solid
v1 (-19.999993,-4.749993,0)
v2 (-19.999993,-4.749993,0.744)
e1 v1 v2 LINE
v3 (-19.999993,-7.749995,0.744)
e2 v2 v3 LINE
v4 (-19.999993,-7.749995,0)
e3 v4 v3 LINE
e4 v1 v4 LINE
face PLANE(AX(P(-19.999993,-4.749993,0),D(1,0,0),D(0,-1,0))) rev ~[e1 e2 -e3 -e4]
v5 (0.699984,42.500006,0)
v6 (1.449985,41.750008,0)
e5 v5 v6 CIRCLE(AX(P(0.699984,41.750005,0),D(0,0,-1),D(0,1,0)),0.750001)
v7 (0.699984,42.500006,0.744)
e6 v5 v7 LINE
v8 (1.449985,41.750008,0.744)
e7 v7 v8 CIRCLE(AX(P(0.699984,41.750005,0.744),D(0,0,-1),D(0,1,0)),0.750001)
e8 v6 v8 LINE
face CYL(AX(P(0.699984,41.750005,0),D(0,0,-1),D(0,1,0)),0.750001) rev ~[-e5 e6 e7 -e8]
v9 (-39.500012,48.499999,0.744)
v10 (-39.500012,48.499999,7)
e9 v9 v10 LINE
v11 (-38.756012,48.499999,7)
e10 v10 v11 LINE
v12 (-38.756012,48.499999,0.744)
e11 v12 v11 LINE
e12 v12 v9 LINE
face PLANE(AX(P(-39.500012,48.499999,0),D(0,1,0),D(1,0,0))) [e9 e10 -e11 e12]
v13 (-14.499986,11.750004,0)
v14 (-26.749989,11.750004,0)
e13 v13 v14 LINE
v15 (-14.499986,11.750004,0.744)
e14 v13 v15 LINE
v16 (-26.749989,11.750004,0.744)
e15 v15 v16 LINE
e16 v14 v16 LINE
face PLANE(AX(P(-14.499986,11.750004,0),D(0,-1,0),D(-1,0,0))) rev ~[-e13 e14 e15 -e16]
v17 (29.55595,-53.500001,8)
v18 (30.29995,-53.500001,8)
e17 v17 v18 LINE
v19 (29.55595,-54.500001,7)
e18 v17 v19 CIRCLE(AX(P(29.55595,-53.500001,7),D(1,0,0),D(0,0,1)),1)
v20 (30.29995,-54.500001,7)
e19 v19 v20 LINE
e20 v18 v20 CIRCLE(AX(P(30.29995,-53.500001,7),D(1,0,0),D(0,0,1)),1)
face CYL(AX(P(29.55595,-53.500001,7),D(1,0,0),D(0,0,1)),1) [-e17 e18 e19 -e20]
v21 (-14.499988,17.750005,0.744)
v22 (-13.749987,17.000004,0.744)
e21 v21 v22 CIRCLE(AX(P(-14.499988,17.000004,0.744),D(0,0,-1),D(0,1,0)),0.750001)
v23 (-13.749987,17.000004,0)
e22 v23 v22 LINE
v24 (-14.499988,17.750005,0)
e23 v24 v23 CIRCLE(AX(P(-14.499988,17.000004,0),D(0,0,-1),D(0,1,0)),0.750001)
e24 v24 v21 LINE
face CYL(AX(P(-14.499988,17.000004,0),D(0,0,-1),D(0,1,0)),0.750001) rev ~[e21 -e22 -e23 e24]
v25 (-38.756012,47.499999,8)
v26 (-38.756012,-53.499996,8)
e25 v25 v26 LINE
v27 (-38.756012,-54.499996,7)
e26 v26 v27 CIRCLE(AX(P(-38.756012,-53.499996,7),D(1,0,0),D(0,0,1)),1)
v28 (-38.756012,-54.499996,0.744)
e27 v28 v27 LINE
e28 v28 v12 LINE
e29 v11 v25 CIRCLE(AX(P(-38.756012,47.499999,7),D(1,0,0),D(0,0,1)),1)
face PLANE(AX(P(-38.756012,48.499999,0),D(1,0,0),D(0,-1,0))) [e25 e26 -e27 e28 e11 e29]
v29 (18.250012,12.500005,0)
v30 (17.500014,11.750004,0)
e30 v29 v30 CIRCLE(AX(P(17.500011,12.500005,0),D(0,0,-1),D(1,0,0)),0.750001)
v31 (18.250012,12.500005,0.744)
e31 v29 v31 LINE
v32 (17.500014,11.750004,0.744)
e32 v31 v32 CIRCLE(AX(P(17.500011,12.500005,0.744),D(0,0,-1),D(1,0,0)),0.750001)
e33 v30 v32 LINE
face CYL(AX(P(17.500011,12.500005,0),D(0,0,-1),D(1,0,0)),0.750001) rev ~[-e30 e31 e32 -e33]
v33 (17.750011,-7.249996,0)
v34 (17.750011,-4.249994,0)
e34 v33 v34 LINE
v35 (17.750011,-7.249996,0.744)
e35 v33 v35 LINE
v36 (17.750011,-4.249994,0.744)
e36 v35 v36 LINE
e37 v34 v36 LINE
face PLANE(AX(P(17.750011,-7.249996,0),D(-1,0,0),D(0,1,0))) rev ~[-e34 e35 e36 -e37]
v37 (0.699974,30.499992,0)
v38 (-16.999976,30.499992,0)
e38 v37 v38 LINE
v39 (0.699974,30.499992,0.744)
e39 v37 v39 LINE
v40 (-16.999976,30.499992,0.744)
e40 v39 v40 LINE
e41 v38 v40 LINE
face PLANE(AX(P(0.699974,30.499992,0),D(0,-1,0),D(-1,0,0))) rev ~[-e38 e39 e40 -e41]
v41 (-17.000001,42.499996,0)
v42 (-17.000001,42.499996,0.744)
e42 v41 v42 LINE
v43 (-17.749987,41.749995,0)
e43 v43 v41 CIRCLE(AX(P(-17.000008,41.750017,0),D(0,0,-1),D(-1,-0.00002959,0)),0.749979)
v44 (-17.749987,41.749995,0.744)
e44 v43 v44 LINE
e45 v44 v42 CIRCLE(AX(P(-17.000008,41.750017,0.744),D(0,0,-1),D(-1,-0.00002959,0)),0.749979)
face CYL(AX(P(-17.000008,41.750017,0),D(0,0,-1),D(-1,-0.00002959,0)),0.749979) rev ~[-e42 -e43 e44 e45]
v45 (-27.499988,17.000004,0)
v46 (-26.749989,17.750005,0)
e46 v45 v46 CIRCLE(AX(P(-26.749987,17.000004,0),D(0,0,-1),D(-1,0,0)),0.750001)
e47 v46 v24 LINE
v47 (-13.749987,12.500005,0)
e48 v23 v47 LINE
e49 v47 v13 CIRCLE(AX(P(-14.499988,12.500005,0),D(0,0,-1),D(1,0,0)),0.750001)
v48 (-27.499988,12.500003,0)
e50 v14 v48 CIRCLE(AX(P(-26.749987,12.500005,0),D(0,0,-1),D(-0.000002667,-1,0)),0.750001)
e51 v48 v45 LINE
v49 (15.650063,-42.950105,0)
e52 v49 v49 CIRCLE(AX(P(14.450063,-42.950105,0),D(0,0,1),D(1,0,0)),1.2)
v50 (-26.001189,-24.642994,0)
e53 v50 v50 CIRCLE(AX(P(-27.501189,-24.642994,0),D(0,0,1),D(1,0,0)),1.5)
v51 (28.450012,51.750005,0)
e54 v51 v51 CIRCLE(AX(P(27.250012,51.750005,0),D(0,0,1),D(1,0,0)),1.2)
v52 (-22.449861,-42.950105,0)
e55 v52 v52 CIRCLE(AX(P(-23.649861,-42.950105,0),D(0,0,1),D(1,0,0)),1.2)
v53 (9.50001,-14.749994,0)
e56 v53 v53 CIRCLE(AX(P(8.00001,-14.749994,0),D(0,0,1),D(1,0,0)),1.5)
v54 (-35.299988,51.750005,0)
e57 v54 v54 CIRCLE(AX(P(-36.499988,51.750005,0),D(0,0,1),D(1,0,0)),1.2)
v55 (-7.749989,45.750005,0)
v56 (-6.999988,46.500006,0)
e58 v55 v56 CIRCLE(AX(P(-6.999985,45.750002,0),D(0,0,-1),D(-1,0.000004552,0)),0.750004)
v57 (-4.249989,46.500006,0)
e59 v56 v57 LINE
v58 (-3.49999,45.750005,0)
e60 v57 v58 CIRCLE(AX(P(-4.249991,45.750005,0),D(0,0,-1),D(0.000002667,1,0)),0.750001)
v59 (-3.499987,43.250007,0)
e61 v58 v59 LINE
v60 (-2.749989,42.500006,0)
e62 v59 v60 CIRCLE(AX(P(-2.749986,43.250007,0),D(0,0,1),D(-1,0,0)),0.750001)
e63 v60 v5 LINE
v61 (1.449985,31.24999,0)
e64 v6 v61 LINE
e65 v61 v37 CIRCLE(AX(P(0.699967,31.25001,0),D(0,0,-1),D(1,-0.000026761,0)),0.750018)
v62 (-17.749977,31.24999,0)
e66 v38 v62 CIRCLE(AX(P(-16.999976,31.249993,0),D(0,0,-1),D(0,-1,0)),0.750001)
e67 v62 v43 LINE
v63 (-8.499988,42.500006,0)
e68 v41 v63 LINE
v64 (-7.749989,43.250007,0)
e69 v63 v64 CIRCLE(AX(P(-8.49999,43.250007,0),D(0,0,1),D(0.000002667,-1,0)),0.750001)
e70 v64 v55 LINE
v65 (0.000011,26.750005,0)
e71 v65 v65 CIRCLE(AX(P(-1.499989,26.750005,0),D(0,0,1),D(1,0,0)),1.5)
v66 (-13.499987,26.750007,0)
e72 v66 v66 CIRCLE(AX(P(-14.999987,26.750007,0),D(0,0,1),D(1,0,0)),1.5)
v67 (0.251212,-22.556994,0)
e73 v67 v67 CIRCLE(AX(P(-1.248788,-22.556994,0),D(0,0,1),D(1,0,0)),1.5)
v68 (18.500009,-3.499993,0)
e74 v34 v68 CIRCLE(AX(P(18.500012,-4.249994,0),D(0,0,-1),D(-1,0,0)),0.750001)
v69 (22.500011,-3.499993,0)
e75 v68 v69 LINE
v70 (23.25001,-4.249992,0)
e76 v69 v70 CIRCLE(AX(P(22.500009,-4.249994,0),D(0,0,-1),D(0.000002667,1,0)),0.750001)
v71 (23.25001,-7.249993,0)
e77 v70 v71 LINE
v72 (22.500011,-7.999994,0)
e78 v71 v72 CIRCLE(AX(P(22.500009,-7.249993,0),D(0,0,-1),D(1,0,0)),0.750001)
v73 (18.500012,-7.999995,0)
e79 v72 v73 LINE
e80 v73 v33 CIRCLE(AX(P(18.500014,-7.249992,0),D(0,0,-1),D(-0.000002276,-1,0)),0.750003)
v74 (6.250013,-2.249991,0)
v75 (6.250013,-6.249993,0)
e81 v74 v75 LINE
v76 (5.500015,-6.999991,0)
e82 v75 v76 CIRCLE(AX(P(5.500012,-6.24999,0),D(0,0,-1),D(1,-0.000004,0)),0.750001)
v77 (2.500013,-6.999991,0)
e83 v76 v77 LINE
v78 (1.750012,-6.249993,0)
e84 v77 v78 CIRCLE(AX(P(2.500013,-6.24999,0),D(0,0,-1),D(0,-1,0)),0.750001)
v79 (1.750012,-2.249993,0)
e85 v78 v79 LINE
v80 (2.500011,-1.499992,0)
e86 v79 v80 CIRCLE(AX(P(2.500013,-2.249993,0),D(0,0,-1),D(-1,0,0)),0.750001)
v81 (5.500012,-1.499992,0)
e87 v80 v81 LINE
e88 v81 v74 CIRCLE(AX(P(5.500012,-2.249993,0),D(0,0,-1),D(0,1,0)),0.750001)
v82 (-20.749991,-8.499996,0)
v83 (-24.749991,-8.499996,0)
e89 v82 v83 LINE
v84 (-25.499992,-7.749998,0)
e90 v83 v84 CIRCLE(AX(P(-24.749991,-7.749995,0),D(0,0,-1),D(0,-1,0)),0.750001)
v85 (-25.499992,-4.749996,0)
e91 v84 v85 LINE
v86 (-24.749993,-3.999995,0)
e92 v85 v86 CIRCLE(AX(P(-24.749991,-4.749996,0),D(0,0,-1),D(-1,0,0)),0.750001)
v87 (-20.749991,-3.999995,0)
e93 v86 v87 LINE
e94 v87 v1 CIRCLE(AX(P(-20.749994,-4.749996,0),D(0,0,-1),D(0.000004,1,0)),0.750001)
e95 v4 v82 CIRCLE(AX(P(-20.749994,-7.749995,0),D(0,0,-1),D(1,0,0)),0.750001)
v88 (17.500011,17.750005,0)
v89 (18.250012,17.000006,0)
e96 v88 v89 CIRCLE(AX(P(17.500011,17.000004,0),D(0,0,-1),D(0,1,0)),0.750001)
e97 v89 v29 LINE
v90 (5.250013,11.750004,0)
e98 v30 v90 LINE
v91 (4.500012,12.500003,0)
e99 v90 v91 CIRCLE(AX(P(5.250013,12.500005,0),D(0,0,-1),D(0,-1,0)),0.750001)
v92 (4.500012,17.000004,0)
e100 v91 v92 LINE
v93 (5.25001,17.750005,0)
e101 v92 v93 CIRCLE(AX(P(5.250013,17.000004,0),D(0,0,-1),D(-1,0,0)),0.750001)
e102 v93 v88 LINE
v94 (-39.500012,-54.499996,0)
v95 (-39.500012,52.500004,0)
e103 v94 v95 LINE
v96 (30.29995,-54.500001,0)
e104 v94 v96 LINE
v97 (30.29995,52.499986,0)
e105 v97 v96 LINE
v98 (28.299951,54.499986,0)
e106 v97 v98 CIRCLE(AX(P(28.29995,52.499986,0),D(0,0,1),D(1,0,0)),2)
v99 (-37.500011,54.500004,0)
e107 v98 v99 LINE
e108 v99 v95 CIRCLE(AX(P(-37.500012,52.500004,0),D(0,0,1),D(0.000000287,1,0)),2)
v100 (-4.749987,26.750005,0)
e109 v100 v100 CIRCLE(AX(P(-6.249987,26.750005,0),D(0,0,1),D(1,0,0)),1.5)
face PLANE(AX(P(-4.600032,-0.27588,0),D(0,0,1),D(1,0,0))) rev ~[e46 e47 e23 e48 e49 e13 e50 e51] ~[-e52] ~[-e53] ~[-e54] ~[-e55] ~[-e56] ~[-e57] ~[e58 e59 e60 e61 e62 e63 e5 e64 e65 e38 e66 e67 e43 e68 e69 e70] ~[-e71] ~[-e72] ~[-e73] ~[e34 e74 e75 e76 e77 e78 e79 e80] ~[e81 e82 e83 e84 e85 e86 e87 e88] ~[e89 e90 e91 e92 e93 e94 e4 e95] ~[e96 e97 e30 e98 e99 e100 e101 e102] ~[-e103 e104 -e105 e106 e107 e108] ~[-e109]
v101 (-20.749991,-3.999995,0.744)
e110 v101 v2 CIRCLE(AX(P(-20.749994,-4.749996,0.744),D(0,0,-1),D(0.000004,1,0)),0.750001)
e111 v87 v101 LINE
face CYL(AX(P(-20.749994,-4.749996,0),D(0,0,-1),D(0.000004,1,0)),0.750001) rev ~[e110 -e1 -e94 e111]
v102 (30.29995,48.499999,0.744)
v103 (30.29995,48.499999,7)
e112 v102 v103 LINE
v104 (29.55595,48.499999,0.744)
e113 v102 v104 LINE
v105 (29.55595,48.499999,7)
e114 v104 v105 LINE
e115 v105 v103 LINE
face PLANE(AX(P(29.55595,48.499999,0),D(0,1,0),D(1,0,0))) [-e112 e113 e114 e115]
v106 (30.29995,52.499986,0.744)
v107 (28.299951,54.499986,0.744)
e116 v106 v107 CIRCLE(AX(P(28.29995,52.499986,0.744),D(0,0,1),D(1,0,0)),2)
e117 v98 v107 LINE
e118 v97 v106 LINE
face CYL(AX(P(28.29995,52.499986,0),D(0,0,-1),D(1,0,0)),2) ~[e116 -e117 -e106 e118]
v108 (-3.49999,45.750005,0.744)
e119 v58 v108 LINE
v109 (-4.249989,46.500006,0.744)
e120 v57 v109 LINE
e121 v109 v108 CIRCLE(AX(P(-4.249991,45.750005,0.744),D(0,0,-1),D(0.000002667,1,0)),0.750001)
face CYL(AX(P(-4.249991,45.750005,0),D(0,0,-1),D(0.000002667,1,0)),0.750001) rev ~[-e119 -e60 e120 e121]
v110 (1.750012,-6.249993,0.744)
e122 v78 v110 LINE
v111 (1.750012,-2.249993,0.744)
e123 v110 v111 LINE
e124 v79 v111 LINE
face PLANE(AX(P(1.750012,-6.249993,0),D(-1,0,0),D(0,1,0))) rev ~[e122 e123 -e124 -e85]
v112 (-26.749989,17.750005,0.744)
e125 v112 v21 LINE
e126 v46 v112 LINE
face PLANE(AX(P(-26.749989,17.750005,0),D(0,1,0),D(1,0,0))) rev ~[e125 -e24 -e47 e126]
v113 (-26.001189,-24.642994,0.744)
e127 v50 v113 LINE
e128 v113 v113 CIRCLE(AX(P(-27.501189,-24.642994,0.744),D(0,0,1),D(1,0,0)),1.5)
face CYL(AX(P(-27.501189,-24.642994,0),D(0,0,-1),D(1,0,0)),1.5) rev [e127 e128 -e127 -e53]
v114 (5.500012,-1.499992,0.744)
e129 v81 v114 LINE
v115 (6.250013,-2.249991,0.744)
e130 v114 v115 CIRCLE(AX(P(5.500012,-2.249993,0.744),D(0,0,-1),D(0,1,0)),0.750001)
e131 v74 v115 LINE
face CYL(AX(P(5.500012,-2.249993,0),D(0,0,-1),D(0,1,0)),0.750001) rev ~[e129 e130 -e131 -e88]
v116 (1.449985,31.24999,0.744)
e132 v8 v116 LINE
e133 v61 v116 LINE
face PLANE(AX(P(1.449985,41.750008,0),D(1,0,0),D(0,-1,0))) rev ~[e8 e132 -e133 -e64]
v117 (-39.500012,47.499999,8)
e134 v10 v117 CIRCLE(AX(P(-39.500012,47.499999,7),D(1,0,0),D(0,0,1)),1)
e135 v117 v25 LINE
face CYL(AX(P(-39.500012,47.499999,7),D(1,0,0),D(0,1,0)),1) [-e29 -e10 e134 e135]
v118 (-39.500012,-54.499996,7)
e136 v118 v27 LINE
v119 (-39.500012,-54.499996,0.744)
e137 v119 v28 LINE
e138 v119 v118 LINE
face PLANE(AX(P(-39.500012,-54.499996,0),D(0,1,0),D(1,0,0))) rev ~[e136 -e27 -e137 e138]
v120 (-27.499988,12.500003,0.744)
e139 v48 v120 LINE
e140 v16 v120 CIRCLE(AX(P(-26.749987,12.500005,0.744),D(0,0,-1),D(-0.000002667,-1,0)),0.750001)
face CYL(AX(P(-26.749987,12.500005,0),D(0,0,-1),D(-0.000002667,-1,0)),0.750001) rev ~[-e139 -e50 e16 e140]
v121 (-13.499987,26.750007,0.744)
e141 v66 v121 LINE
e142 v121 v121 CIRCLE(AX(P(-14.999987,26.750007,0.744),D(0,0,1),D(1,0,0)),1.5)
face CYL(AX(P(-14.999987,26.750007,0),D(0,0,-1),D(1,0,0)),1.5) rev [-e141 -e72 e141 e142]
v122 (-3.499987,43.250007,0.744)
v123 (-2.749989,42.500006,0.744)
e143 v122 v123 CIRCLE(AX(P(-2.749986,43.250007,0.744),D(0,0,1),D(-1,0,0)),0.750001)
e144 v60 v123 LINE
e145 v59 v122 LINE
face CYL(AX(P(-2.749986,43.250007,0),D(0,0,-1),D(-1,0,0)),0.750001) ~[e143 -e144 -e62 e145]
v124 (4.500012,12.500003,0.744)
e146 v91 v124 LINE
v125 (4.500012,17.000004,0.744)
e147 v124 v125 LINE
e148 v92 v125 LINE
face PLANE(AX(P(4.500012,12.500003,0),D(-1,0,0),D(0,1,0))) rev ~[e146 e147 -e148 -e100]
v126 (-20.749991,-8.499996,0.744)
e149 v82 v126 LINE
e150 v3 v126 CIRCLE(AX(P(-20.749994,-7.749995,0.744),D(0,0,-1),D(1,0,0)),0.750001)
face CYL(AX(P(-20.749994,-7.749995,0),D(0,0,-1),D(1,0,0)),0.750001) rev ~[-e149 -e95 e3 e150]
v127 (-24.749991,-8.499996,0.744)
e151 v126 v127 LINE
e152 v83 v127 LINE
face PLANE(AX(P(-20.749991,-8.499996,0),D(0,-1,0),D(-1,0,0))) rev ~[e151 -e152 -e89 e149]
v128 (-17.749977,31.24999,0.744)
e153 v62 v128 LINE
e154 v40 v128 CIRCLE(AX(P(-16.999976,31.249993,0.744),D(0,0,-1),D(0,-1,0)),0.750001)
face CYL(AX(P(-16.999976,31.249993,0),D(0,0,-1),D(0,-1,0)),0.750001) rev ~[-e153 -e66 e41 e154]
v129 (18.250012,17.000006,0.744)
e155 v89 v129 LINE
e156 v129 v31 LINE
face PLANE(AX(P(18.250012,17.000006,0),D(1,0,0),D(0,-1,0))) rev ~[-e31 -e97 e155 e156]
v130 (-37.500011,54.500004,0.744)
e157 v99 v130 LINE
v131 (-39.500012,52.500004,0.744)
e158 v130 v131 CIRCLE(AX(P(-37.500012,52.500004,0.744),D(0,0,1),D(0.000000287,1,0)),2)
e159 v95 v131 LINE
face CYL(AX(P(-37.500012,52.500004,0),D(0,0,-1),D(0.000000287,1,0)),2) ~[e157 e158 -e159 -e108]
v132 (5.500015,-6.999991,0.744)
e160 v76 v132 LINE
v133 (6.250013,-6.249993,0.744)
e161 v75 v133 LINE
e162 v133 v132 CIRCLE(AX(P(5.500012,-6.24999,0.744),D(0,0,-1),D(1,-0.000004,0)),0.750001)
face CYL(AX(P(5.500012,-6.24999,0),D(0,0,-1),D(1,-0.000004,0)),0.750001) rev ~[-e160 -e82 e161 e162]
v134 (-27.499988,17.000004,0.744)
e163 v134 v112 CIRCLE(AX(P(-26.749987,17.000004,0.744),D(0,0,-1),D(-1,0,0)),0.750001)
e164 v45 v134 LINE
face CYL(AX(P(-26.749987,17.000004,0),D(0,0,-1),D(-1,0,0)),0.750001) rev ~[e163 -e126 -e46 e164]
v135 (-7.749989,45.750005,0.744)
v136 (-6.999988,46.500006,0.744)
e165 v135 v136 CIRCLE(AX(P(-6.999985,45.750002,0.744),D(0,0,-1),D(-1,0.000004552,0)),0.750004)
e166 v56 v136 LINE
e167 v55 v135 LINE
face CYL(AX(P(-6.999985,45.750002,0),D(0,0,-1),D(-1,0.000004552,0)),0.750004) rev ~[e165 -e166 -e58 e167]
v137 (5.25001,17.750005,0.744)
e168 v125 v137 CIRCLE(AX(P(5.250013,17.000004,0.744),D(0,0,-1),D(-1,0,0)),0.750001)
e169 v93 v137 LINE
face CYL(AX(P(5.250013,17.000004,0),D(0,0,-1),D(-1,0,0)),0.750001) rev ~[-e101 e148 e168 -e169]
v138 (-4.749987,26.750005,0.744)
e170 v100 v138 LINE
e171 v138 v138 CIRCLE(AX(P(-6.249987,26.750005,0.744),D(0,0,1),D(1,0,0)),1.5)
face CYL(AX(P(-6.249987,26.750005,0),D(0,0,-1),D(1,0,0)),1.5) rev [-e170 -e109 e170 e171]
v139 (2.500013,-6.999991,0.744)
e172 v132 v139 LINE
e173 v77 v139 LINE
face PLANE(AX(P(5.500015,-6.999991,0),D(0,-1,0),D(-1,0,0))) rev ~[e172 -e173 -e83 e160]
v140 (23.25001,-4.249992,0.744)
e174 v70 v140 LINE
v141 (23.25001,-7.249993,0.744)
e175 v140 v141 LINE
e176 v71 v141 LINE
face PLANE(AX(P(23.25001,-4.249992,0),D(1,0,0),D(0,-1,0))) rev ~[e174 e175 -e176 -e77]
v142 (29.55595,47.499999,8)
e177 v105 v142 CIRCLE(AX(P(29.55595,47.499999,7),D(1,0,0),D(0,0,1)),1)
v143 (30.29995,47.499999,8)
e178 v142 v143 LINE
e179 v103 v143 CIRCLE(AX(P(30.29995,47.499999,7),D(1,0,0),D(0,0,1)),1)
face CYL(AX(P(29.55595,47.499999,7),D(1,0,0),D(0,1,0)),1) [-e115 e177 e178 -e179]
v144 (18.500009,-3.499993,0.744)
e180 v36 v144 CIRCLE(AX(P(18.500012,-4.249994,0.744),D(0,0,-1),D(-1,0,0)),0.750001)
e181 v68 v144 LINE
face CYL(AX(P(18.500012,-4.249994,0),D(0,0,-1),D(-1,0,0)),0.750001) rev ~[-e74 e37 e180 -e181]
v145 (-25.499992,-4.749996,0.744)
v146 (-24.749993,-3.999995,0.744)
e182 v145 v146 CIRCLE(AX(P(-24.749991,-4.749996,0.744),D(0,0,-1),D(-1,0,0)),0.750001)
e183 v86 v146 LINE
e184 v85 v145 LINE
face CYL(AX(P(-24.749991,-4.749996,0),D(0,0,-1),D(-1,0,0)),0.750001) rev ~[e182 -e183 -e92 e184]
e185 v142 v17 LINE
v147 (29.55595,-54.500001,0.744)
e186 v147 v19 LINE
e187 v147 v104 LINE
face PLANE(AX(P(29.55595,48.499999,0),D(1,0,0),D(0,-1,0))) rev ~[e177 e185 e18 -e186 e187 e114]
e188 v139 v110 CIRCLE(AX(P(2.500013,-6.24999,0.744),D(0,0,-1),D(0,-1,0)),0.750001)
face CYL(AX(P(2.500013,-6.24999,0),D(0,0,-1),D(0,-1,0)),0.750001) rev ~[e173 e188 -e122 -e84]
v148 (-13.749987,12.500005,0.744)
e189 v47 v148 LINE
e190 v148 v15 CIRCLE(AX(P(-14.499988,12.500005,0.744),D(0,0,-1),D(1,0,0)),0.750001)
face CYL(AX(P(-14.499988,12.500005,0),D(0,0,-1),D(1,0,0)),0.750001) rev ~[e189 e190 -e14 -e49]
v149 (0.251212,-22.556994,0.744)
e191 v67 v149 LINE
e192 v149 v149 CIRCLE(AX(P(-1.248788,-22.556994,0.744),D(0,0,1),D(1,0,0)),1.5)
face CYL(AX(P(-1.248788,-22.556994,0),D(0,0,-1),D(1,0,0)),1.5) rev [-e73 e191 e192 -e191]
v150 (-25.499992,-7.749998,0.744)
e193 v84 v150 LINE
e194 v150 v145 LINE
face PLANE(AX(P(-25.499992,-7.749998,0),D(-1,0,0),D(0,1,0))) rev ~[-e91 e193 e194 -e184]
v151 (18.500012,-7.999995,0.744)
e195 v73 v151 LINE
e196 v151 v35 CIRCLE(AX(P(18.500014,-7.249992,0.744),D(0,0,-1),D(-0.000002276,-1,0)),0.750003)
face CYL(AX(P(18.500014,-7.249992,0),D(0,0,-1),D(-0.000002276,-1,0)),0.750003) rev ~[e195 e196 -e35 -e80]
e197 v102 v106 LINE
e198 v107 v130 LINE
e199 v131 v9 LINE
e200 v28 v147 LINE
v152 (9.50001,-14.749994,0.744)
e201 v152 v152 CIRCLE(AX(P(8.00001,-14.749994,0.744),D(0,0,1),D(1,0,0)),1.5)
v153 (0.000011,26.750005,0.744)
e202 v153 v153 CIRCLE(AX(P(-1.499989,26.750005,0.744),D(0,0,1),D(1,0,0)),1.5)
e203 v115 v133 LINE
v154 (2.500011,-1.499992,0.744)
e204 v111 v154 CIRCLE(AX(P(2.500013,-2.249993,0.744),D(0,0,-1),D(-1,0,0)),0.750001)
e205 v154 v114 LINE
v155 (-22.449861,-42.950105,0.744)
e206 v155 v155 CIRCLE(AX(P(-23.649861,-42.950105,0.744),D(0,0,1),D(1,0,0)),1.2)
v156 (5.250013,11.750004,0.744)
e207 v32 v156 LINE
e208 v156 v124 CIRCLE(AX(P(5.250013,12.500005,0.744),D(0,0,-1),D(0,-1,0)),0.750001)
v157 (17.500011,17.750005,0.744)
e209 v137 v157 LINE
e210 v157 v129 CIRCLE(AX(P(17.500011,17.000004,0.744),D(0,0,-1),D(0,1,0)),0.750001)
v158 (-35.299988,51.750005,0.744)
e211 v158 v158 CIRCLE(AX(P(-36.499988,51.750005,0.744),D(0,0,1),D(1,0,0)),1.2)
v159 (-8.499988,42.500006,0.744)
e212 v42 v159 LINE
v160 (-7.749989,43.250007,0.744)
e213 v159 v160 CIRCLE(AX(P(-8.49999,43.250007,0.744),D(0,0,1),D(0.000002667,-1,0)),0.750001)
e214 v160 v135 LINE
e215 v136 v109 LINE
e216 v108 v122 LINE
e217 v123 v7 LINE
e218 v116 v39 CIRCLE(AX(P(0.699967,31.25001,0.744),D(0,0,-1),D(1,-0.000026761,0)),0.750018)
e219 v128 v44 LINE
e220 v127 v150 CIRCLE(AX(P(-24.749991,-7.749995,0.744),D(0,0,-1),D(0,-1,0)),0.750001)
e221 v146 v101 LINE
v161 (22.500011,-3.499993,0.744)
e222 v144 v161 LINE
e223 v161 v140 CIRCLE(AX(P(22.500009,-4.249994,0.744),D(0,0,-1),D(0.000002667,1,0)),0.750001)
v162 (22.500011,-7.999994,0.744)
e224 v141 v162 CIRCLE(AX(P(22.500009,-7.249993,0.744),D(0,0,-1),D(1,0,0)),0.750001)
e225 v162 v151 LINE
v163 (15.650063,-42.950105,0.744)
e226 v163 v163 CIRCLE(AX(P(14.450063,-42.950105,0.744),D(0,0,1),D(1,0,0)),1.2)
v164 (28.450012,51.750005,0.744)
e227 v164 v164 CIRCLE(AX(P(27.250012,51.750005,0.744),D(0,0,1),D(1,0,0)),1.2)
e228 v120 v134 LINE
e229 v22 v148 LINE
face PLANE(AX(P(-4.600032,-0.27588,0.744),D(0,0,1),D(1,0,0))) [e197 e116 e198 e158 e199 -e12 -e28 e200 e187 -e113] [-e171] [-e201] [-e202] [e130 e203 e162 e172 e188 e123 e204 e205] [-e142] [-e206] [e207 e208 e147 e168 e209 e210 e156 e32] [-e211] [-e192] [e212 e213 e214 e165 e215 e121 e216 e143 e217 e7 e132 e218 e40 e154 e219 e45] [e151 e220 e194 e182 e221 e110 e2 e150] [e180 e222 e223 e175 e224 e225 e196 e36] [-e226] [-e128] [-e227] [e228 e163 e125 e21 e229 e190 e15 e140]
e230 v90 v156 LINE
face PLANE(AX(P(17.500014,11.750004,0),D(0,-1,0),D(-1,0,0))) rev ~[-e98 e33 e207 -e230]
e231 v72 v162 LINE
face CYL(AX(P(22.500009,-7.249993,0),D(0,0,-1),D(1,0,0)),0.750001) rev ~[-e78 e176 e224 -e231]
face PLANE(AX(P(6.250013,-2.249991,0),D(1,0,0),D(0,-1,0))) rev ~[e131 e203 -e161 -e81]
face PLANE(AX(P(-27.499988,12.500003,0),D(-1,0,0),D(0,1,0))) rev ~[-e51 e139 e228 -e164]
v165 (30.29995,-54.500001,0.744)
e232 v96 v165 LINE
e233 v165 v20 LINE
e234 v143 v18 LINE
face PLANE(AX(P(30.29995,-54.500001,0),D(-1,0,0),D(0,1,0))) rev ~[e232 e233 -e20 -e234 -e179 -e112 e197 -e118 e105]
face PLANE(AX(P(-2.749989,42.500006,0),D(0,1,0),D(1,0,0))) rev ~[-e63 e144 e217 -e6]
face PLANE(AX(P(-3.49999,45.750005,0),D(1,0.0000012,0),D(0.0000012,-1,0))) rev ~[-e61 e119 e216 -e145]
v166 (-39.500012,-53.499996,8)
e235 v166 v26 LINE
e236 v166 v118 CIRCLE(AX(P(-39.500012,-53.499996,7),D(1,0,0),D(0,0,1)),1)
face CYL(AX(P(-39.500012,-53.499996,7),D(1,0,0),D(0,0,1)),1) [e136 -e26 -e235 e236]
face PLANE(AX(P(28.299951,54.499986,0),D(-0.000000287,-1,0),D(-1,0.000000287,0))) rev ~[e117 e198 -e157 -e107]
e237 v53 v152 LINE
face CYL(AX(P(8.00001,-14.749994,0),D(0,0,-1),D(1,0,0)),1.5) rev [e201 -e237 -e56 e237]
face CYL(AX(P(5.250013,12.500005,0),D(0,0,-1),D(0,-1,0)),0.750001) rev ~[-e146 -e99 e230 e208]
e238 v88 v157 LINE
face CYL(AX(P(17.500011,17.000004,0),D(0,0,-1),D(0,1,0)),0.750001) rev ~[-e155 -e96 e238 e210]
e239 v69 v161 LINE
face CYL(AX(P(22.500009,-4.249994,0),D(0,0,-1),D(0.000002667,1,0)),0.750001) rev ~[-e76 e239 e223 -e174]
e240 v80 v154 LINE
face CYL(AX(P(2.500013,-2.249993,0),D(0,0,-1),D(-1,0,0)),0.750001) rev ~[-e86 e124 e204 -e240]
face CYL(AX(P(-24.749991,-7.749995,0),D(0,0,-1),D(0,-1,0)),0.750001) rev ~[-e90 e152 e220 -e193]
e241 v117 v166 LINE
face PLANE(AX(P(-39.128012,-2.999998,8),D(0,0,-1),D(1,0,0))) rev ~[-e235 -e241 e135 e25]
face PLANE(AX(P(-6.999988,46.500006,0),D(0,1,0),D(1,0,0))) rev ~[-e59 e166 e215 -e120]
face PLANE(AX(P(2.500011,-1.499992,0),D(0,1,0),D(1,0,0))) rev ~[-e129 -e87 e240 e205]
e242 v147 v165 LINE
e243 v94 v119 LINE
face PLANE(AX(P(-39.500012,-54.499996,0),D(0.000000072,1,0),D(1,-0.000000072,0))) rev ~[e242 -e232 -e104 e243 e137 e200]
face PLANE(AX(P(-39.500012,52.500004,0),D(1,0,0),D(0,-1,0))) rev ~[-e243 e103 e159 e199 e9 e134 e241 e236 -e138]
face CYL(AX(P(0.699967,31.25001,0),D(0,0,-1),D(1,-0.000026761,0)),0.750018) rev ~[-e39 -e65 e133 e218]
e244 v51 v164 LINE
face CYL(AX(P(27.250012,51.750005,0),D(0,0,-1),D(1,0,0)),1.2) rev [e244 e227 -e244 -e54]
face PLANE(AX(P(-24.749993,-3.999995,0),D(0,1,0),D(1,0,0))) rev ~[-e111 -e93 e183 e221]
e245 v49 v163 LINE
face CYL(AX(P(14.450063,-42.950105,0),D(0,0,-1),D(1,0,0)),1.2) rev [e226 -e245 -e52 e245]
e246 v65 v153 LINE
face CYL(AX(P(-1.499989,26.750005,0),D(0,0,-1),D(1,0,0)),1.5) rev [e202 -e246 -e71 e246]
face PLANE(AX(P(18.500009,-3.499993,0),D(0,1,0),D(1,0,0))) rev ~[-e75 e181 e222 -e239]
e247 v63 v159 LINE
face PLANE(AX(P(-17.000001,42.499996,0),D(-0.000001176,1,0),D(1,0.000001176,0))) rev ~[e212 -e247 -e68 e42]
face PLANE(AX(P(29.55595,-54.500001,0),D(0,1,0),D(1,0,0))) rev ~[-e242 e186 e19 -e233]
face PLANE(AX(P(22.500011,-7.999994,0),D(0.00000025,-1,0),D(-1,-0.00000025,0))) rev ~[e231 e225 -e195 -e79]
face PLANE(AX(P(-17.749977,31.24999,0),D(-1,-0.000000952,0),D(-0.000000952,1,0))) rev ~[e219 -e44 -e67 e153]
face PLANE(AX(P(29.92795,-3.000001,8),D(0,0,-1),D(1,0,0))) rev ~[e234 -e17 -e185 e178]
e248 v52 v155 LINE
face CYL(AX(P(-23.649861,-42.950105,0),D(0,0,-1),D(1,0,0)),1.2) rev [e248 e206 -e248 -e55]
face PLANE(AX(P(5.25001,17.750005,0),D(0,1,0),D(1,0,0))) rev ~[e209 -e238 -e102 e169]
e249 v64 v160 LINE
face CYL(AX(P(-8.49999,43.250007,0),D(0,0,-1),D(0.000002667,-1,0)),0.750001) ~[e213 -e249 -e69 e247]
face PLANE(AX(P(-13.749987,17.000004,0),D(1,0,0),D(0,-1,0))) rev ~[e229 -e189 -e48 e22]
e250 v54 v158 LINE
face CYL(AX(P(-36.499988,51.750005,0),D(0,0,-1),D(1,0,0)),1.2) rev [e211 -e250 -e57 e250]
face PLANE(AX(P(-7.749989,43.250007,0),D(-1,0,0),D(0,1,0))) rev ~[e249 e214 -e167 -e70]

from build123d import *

# Parameters (mm, degrees)
F0_R     = 1.2
F0_R_2   = 1.5
F1_DEPTH = 0.744
F2_W     = 0.744
F2_H     = 103
F2_H_2   = 102.999995
F3_DEPTH = 8
F4_R     = 1


# Not quite as in the source:
# - ends of sketch curves that miss each other by under 0.0002 mm in the source are joined


with BuildPart() as f1:
    # F0 (on Top) → F1 (new body)
    with BuildSketch(Plane.XY):
        with BuildLine():
            Line((-39.500012, -54.499996), (30.29995, -54.500001))
            Line((30.29995, -54.500001), (30.29995, 52.4999855731))
            ThreePointArc((30.29995, 52.4999855731), (29.714163765, 53.9141989328), (28.2999505731, 54.4999855731))
            Line((28.2999505731, 54.4999855731), (-37.5000114269, 54.5000044269))
            ThreePointArc((-37.5000114269, 54.5000044269), (-38.9142253598, 53.9142181919), (-39.500012, 52.5000044269))
            Line((-39.500012, 52.5000044269), (-39.500012, -54.499996))
        make_face()
        with Locations((-23.649861, -42.950105)):
            Circle(F0_R, mode=Mode.SUBTRACT)
        with Locations((-27.501189, -24.642994)):
            Circle(F0_R_2, mode=Mode.SUBTRACT)
        with BuildLine():
            Line((-20.749991, -8.499996), (-24.749991, -8.499996))
            ThreePointArc((-24.749991, -8.499996), (-25.2803207323, -8.2803268537), (-25.499992, -7.749998))
            Line((-25.499992, -7.749998), (-25.499992, -4.749996))
            ThreePointArc((-25.499992, -4.749996), (-25.2803225001, -4.2196659141), (-24.749993, -3.999995))
            Line((-24.749993, -3.999995), (-20.749991, -3.999995))
            ThreePointArc((-20.749991, -3.999995), (-20.2196642677, -4.2196641463), (-19.999993, -4.749993))
            Line((-19.999993, -4.749993), (-19.999993, -7.749995))
            ThreePointArc((-19.999993, -7.749995), (-20.2196621463, -8.2803247323), (-20.749991, -8.499996))
        make_face(mode=Mode.SUBTRACT)
        with Locations((14.450063, -42.950105)):
            Circle(F0_R, mode=Mode.SUBTRACT)
        with Locations((-1.248788, -22.556994)):
            Circle(F0_R_2, mode=Mode.SUBTRACT)
        with Locations((8.00001, -14.749994)):
            Circle(F0_R_2, mode=Mode.SUBTRACT)
        with BuildLine():
            ThreePointArc((2.500013, -6.999991), (1.9696832677, -6.7803218537), (1.750012, -6.249993))
            Line((1.750012, -6.249993), (1.750012, -2.249993))
            ThreePointArc((1.750012, -2.249993), (1.9696814999, -1.7196629141), (2.500011, -1.499992))
            Line((2.500011, -1.499992), (5.500012, -1.499992))
            ThreePointArc((5.500012, -1.499992), (6.0303420859, -1.7196614999), (6.250013, -2.249991))
            Line((6.250013, -2.249991), (6.250013, -6.249993))
            ThreePointArc((6.250013, -6.249993), (6.0303438537, -6.7803197323), (5.500015, -6.999991))
            Line((5.500015, -6.999991), (2.500013, -6.999991))
        make_face(mode=Mode.SUBTRACT)
        with BuildLine():
            ThreePointArc((17.750011, -4.249994), (17.9696801463, -3.7196642677), (18.500009, -3.499993))
            Line((18.500009, -3.499993), (22.500011, -3.499993))
            ThreePointArc((22.500011, -3.499993), (23.0303390859, -3.7196624999), (23.25001, -4.249992))
            Line((23.25001, -4.249992), (23.25001, -7.249993))
            ThreePointArc((23.25001, -7.249993), (23.0303405001, -7.7803230859), (22.500011, -7.999994))
            Line((22.500011, -7.999994), (18.500012, -7.999995))
            ThreePointArc((18.500012, -7.999995), (17.9696822677, -7.7803248537), (17.750011, -7.249996))
            Line((17.750011, -7.249996), (17.750011, -4.249994))
        make_face(mode=Mode.SUBTRACT)
        with BuildLine():
            Line((-13.749987, 17.000004), (-13.749987, 12.500005))
            ThreePointArc((-13.749987, 12.500005), (-13.9696564999, 11.9696749141), (-14.499986, 11.750004))
            Line((-14.499986, 11.750004), (-26.749989, 11.750004))
            ThreePointArc((-26.749989, 11.750004), (-27.2803170859, 11.9696734999), (-27.499988, 12.500003))
            Line((-27.499988, 12.500003), (-27.499988, 17.000004))
            ThreePointArc((-27.499988, 17.000004), (-27.2803185001, 17.5303340859), (-26.749989, 17.750005))
            Line((-26.749989, 17.750005), (-14.499988, 17.750005))
            ThreePointArc((-14.499988, 17.750005), (-13.9696579141, 17.5303355001), (-13.749987, 17.000004))
        make_face(mode=Mode.SUBTRACT)
        with Locations((-14.999987, 26.750007)):
            Circle(F0_R_2, mode=Mode.SUBTRACT)
        with Locations((-6.249987, 26.750005)):
            Circle(F0_R_2, mode=Mode.SUBTRACT)
        with Locations((-36.499988, 51.750005)):
            Circle(F0_R, mode=Mode.SUBTRACT)
        with BuildLine():
            ThreePointArc((-16.999976, 30.499992), (-17.5303057323, 30.7196611463), (-17.749977, 31.24999))
            Line((-17.749977, 31.24999), (-17.749987, 41.749995))
            ThreePointArc((-17.749987, 41.749995), (-17.5303305001, 42.2803250859), (-17.000001, 42.499996))
            Line((-17.000001, 42.499996), (-8.499988, 42.500006))
            ThreePointArc((-8.499988, 42.500006), (-7.9696584999, 42.7196769141), (-7.749989, 43.250007))
            Line((-7.749989, 43.250007), (-7.749989, 45.750005))
            ThreePointArc((-7.749989, 45.750005), (-7.5303175001, 46.2803350859), (-6.999988, 46.500006))
            Line((-6.999988, 46.500006), (-4.249989, 46.500006))
            ThreePointArc((-4.249989, 46.500006), (-3.7196594999, 46.2803350859), (-3.49999, 45.750005))
            Line((-3.49999, 45.750005), (-3.499987, 43.250007))
            ThreePointArc((-3.499987, 43.250007), (-3.2803178537, 42.7196772677), (-2.749989, 42.500006))
            Line((-2.749989, 42.500006), (0.699984, 42.500006))
            ThreePointArc((0.699984, 42.500006), (1.2303137323, 42.2803368537), (1.449985, 41.750008))
            Line((1.449985, 41.750008), (1.449985, 41.250006))
            Line((1.449985, 41.250006), (1.449985, 31.24999))
            ThreePointArc((1.449985, 31.24999), (1.2303037323, 30.7196611463), (0.699974, 30.499992))
            Line((0.699974, 30.499992), (-16.999976, 30.499992))
        make_face(mode=Mode.SUBTRACT)
        with Locations((-1.499989, 26.750005)):
            Circle(F0_R_2, mode=Mode.SUBTRACT)
        with BuildLine():
            ThreePointArc((5.250013, 11.750004), (4.7196829141, 11.9696734999), (4.500012, 12.500003))
            Line((4.500012, 12.500003), (4.500012, 17.000004))
            ThreePointArc((4.500012, 17.000004), (4.7196811463, 17.5303337323), (5.25001, 17.750005))
            Line((5.25001, 17.750005), (17.500011, 17.750005))
            ThreePointArc((17.500011, 17.750005), (18.0303410859, 17.5303355001), (18.250012, 17.000006))
            Line((18.250012, 17.000006), (18.250012, 12.500005))
            ThreePointArc((18.250012, 12.500005), (18.0303428537, 11.9696752677), (17.500014, 11.750004))
            Line((17.500014, 11.750004), (5.250013, 11.750004))
        make_face(mode=Mode.SUBTRACT)
        with Locations((27.250012, 51.750005)):
            Circle(F0_R, mode=Mode.SUBTRACT)
    extrude(amount=F1_DEPTH)

    # F2 (on face) → F3 (join)
    with BuildSketch(Plane(origin=(0, 0, 0), x_dir=(1, 0, 0), z_dir=(0, 0, -1))):
        with Locations((29.92795, 3.000001)):
            Rectangle(F2_W, F2_H)
        with Locations((-39.128012, 2.9999985)):
            Rectangle(F2_W, F2_H_2)
    extrude(amount=-F3_DEPTH)

    # F4
    f4_edges = [f1.edges().sort_by_distance(p)[0] for p in [
        (29.92795, -54.500001, 8),
        (29.92795, 48.499999, 8),
        (-39.128012, 48.499999, 8),
        (-39.128012, -54.499996, 8),
    ]]
    fillet(f4_edges, radius=F4_R)


solid = f1.part
